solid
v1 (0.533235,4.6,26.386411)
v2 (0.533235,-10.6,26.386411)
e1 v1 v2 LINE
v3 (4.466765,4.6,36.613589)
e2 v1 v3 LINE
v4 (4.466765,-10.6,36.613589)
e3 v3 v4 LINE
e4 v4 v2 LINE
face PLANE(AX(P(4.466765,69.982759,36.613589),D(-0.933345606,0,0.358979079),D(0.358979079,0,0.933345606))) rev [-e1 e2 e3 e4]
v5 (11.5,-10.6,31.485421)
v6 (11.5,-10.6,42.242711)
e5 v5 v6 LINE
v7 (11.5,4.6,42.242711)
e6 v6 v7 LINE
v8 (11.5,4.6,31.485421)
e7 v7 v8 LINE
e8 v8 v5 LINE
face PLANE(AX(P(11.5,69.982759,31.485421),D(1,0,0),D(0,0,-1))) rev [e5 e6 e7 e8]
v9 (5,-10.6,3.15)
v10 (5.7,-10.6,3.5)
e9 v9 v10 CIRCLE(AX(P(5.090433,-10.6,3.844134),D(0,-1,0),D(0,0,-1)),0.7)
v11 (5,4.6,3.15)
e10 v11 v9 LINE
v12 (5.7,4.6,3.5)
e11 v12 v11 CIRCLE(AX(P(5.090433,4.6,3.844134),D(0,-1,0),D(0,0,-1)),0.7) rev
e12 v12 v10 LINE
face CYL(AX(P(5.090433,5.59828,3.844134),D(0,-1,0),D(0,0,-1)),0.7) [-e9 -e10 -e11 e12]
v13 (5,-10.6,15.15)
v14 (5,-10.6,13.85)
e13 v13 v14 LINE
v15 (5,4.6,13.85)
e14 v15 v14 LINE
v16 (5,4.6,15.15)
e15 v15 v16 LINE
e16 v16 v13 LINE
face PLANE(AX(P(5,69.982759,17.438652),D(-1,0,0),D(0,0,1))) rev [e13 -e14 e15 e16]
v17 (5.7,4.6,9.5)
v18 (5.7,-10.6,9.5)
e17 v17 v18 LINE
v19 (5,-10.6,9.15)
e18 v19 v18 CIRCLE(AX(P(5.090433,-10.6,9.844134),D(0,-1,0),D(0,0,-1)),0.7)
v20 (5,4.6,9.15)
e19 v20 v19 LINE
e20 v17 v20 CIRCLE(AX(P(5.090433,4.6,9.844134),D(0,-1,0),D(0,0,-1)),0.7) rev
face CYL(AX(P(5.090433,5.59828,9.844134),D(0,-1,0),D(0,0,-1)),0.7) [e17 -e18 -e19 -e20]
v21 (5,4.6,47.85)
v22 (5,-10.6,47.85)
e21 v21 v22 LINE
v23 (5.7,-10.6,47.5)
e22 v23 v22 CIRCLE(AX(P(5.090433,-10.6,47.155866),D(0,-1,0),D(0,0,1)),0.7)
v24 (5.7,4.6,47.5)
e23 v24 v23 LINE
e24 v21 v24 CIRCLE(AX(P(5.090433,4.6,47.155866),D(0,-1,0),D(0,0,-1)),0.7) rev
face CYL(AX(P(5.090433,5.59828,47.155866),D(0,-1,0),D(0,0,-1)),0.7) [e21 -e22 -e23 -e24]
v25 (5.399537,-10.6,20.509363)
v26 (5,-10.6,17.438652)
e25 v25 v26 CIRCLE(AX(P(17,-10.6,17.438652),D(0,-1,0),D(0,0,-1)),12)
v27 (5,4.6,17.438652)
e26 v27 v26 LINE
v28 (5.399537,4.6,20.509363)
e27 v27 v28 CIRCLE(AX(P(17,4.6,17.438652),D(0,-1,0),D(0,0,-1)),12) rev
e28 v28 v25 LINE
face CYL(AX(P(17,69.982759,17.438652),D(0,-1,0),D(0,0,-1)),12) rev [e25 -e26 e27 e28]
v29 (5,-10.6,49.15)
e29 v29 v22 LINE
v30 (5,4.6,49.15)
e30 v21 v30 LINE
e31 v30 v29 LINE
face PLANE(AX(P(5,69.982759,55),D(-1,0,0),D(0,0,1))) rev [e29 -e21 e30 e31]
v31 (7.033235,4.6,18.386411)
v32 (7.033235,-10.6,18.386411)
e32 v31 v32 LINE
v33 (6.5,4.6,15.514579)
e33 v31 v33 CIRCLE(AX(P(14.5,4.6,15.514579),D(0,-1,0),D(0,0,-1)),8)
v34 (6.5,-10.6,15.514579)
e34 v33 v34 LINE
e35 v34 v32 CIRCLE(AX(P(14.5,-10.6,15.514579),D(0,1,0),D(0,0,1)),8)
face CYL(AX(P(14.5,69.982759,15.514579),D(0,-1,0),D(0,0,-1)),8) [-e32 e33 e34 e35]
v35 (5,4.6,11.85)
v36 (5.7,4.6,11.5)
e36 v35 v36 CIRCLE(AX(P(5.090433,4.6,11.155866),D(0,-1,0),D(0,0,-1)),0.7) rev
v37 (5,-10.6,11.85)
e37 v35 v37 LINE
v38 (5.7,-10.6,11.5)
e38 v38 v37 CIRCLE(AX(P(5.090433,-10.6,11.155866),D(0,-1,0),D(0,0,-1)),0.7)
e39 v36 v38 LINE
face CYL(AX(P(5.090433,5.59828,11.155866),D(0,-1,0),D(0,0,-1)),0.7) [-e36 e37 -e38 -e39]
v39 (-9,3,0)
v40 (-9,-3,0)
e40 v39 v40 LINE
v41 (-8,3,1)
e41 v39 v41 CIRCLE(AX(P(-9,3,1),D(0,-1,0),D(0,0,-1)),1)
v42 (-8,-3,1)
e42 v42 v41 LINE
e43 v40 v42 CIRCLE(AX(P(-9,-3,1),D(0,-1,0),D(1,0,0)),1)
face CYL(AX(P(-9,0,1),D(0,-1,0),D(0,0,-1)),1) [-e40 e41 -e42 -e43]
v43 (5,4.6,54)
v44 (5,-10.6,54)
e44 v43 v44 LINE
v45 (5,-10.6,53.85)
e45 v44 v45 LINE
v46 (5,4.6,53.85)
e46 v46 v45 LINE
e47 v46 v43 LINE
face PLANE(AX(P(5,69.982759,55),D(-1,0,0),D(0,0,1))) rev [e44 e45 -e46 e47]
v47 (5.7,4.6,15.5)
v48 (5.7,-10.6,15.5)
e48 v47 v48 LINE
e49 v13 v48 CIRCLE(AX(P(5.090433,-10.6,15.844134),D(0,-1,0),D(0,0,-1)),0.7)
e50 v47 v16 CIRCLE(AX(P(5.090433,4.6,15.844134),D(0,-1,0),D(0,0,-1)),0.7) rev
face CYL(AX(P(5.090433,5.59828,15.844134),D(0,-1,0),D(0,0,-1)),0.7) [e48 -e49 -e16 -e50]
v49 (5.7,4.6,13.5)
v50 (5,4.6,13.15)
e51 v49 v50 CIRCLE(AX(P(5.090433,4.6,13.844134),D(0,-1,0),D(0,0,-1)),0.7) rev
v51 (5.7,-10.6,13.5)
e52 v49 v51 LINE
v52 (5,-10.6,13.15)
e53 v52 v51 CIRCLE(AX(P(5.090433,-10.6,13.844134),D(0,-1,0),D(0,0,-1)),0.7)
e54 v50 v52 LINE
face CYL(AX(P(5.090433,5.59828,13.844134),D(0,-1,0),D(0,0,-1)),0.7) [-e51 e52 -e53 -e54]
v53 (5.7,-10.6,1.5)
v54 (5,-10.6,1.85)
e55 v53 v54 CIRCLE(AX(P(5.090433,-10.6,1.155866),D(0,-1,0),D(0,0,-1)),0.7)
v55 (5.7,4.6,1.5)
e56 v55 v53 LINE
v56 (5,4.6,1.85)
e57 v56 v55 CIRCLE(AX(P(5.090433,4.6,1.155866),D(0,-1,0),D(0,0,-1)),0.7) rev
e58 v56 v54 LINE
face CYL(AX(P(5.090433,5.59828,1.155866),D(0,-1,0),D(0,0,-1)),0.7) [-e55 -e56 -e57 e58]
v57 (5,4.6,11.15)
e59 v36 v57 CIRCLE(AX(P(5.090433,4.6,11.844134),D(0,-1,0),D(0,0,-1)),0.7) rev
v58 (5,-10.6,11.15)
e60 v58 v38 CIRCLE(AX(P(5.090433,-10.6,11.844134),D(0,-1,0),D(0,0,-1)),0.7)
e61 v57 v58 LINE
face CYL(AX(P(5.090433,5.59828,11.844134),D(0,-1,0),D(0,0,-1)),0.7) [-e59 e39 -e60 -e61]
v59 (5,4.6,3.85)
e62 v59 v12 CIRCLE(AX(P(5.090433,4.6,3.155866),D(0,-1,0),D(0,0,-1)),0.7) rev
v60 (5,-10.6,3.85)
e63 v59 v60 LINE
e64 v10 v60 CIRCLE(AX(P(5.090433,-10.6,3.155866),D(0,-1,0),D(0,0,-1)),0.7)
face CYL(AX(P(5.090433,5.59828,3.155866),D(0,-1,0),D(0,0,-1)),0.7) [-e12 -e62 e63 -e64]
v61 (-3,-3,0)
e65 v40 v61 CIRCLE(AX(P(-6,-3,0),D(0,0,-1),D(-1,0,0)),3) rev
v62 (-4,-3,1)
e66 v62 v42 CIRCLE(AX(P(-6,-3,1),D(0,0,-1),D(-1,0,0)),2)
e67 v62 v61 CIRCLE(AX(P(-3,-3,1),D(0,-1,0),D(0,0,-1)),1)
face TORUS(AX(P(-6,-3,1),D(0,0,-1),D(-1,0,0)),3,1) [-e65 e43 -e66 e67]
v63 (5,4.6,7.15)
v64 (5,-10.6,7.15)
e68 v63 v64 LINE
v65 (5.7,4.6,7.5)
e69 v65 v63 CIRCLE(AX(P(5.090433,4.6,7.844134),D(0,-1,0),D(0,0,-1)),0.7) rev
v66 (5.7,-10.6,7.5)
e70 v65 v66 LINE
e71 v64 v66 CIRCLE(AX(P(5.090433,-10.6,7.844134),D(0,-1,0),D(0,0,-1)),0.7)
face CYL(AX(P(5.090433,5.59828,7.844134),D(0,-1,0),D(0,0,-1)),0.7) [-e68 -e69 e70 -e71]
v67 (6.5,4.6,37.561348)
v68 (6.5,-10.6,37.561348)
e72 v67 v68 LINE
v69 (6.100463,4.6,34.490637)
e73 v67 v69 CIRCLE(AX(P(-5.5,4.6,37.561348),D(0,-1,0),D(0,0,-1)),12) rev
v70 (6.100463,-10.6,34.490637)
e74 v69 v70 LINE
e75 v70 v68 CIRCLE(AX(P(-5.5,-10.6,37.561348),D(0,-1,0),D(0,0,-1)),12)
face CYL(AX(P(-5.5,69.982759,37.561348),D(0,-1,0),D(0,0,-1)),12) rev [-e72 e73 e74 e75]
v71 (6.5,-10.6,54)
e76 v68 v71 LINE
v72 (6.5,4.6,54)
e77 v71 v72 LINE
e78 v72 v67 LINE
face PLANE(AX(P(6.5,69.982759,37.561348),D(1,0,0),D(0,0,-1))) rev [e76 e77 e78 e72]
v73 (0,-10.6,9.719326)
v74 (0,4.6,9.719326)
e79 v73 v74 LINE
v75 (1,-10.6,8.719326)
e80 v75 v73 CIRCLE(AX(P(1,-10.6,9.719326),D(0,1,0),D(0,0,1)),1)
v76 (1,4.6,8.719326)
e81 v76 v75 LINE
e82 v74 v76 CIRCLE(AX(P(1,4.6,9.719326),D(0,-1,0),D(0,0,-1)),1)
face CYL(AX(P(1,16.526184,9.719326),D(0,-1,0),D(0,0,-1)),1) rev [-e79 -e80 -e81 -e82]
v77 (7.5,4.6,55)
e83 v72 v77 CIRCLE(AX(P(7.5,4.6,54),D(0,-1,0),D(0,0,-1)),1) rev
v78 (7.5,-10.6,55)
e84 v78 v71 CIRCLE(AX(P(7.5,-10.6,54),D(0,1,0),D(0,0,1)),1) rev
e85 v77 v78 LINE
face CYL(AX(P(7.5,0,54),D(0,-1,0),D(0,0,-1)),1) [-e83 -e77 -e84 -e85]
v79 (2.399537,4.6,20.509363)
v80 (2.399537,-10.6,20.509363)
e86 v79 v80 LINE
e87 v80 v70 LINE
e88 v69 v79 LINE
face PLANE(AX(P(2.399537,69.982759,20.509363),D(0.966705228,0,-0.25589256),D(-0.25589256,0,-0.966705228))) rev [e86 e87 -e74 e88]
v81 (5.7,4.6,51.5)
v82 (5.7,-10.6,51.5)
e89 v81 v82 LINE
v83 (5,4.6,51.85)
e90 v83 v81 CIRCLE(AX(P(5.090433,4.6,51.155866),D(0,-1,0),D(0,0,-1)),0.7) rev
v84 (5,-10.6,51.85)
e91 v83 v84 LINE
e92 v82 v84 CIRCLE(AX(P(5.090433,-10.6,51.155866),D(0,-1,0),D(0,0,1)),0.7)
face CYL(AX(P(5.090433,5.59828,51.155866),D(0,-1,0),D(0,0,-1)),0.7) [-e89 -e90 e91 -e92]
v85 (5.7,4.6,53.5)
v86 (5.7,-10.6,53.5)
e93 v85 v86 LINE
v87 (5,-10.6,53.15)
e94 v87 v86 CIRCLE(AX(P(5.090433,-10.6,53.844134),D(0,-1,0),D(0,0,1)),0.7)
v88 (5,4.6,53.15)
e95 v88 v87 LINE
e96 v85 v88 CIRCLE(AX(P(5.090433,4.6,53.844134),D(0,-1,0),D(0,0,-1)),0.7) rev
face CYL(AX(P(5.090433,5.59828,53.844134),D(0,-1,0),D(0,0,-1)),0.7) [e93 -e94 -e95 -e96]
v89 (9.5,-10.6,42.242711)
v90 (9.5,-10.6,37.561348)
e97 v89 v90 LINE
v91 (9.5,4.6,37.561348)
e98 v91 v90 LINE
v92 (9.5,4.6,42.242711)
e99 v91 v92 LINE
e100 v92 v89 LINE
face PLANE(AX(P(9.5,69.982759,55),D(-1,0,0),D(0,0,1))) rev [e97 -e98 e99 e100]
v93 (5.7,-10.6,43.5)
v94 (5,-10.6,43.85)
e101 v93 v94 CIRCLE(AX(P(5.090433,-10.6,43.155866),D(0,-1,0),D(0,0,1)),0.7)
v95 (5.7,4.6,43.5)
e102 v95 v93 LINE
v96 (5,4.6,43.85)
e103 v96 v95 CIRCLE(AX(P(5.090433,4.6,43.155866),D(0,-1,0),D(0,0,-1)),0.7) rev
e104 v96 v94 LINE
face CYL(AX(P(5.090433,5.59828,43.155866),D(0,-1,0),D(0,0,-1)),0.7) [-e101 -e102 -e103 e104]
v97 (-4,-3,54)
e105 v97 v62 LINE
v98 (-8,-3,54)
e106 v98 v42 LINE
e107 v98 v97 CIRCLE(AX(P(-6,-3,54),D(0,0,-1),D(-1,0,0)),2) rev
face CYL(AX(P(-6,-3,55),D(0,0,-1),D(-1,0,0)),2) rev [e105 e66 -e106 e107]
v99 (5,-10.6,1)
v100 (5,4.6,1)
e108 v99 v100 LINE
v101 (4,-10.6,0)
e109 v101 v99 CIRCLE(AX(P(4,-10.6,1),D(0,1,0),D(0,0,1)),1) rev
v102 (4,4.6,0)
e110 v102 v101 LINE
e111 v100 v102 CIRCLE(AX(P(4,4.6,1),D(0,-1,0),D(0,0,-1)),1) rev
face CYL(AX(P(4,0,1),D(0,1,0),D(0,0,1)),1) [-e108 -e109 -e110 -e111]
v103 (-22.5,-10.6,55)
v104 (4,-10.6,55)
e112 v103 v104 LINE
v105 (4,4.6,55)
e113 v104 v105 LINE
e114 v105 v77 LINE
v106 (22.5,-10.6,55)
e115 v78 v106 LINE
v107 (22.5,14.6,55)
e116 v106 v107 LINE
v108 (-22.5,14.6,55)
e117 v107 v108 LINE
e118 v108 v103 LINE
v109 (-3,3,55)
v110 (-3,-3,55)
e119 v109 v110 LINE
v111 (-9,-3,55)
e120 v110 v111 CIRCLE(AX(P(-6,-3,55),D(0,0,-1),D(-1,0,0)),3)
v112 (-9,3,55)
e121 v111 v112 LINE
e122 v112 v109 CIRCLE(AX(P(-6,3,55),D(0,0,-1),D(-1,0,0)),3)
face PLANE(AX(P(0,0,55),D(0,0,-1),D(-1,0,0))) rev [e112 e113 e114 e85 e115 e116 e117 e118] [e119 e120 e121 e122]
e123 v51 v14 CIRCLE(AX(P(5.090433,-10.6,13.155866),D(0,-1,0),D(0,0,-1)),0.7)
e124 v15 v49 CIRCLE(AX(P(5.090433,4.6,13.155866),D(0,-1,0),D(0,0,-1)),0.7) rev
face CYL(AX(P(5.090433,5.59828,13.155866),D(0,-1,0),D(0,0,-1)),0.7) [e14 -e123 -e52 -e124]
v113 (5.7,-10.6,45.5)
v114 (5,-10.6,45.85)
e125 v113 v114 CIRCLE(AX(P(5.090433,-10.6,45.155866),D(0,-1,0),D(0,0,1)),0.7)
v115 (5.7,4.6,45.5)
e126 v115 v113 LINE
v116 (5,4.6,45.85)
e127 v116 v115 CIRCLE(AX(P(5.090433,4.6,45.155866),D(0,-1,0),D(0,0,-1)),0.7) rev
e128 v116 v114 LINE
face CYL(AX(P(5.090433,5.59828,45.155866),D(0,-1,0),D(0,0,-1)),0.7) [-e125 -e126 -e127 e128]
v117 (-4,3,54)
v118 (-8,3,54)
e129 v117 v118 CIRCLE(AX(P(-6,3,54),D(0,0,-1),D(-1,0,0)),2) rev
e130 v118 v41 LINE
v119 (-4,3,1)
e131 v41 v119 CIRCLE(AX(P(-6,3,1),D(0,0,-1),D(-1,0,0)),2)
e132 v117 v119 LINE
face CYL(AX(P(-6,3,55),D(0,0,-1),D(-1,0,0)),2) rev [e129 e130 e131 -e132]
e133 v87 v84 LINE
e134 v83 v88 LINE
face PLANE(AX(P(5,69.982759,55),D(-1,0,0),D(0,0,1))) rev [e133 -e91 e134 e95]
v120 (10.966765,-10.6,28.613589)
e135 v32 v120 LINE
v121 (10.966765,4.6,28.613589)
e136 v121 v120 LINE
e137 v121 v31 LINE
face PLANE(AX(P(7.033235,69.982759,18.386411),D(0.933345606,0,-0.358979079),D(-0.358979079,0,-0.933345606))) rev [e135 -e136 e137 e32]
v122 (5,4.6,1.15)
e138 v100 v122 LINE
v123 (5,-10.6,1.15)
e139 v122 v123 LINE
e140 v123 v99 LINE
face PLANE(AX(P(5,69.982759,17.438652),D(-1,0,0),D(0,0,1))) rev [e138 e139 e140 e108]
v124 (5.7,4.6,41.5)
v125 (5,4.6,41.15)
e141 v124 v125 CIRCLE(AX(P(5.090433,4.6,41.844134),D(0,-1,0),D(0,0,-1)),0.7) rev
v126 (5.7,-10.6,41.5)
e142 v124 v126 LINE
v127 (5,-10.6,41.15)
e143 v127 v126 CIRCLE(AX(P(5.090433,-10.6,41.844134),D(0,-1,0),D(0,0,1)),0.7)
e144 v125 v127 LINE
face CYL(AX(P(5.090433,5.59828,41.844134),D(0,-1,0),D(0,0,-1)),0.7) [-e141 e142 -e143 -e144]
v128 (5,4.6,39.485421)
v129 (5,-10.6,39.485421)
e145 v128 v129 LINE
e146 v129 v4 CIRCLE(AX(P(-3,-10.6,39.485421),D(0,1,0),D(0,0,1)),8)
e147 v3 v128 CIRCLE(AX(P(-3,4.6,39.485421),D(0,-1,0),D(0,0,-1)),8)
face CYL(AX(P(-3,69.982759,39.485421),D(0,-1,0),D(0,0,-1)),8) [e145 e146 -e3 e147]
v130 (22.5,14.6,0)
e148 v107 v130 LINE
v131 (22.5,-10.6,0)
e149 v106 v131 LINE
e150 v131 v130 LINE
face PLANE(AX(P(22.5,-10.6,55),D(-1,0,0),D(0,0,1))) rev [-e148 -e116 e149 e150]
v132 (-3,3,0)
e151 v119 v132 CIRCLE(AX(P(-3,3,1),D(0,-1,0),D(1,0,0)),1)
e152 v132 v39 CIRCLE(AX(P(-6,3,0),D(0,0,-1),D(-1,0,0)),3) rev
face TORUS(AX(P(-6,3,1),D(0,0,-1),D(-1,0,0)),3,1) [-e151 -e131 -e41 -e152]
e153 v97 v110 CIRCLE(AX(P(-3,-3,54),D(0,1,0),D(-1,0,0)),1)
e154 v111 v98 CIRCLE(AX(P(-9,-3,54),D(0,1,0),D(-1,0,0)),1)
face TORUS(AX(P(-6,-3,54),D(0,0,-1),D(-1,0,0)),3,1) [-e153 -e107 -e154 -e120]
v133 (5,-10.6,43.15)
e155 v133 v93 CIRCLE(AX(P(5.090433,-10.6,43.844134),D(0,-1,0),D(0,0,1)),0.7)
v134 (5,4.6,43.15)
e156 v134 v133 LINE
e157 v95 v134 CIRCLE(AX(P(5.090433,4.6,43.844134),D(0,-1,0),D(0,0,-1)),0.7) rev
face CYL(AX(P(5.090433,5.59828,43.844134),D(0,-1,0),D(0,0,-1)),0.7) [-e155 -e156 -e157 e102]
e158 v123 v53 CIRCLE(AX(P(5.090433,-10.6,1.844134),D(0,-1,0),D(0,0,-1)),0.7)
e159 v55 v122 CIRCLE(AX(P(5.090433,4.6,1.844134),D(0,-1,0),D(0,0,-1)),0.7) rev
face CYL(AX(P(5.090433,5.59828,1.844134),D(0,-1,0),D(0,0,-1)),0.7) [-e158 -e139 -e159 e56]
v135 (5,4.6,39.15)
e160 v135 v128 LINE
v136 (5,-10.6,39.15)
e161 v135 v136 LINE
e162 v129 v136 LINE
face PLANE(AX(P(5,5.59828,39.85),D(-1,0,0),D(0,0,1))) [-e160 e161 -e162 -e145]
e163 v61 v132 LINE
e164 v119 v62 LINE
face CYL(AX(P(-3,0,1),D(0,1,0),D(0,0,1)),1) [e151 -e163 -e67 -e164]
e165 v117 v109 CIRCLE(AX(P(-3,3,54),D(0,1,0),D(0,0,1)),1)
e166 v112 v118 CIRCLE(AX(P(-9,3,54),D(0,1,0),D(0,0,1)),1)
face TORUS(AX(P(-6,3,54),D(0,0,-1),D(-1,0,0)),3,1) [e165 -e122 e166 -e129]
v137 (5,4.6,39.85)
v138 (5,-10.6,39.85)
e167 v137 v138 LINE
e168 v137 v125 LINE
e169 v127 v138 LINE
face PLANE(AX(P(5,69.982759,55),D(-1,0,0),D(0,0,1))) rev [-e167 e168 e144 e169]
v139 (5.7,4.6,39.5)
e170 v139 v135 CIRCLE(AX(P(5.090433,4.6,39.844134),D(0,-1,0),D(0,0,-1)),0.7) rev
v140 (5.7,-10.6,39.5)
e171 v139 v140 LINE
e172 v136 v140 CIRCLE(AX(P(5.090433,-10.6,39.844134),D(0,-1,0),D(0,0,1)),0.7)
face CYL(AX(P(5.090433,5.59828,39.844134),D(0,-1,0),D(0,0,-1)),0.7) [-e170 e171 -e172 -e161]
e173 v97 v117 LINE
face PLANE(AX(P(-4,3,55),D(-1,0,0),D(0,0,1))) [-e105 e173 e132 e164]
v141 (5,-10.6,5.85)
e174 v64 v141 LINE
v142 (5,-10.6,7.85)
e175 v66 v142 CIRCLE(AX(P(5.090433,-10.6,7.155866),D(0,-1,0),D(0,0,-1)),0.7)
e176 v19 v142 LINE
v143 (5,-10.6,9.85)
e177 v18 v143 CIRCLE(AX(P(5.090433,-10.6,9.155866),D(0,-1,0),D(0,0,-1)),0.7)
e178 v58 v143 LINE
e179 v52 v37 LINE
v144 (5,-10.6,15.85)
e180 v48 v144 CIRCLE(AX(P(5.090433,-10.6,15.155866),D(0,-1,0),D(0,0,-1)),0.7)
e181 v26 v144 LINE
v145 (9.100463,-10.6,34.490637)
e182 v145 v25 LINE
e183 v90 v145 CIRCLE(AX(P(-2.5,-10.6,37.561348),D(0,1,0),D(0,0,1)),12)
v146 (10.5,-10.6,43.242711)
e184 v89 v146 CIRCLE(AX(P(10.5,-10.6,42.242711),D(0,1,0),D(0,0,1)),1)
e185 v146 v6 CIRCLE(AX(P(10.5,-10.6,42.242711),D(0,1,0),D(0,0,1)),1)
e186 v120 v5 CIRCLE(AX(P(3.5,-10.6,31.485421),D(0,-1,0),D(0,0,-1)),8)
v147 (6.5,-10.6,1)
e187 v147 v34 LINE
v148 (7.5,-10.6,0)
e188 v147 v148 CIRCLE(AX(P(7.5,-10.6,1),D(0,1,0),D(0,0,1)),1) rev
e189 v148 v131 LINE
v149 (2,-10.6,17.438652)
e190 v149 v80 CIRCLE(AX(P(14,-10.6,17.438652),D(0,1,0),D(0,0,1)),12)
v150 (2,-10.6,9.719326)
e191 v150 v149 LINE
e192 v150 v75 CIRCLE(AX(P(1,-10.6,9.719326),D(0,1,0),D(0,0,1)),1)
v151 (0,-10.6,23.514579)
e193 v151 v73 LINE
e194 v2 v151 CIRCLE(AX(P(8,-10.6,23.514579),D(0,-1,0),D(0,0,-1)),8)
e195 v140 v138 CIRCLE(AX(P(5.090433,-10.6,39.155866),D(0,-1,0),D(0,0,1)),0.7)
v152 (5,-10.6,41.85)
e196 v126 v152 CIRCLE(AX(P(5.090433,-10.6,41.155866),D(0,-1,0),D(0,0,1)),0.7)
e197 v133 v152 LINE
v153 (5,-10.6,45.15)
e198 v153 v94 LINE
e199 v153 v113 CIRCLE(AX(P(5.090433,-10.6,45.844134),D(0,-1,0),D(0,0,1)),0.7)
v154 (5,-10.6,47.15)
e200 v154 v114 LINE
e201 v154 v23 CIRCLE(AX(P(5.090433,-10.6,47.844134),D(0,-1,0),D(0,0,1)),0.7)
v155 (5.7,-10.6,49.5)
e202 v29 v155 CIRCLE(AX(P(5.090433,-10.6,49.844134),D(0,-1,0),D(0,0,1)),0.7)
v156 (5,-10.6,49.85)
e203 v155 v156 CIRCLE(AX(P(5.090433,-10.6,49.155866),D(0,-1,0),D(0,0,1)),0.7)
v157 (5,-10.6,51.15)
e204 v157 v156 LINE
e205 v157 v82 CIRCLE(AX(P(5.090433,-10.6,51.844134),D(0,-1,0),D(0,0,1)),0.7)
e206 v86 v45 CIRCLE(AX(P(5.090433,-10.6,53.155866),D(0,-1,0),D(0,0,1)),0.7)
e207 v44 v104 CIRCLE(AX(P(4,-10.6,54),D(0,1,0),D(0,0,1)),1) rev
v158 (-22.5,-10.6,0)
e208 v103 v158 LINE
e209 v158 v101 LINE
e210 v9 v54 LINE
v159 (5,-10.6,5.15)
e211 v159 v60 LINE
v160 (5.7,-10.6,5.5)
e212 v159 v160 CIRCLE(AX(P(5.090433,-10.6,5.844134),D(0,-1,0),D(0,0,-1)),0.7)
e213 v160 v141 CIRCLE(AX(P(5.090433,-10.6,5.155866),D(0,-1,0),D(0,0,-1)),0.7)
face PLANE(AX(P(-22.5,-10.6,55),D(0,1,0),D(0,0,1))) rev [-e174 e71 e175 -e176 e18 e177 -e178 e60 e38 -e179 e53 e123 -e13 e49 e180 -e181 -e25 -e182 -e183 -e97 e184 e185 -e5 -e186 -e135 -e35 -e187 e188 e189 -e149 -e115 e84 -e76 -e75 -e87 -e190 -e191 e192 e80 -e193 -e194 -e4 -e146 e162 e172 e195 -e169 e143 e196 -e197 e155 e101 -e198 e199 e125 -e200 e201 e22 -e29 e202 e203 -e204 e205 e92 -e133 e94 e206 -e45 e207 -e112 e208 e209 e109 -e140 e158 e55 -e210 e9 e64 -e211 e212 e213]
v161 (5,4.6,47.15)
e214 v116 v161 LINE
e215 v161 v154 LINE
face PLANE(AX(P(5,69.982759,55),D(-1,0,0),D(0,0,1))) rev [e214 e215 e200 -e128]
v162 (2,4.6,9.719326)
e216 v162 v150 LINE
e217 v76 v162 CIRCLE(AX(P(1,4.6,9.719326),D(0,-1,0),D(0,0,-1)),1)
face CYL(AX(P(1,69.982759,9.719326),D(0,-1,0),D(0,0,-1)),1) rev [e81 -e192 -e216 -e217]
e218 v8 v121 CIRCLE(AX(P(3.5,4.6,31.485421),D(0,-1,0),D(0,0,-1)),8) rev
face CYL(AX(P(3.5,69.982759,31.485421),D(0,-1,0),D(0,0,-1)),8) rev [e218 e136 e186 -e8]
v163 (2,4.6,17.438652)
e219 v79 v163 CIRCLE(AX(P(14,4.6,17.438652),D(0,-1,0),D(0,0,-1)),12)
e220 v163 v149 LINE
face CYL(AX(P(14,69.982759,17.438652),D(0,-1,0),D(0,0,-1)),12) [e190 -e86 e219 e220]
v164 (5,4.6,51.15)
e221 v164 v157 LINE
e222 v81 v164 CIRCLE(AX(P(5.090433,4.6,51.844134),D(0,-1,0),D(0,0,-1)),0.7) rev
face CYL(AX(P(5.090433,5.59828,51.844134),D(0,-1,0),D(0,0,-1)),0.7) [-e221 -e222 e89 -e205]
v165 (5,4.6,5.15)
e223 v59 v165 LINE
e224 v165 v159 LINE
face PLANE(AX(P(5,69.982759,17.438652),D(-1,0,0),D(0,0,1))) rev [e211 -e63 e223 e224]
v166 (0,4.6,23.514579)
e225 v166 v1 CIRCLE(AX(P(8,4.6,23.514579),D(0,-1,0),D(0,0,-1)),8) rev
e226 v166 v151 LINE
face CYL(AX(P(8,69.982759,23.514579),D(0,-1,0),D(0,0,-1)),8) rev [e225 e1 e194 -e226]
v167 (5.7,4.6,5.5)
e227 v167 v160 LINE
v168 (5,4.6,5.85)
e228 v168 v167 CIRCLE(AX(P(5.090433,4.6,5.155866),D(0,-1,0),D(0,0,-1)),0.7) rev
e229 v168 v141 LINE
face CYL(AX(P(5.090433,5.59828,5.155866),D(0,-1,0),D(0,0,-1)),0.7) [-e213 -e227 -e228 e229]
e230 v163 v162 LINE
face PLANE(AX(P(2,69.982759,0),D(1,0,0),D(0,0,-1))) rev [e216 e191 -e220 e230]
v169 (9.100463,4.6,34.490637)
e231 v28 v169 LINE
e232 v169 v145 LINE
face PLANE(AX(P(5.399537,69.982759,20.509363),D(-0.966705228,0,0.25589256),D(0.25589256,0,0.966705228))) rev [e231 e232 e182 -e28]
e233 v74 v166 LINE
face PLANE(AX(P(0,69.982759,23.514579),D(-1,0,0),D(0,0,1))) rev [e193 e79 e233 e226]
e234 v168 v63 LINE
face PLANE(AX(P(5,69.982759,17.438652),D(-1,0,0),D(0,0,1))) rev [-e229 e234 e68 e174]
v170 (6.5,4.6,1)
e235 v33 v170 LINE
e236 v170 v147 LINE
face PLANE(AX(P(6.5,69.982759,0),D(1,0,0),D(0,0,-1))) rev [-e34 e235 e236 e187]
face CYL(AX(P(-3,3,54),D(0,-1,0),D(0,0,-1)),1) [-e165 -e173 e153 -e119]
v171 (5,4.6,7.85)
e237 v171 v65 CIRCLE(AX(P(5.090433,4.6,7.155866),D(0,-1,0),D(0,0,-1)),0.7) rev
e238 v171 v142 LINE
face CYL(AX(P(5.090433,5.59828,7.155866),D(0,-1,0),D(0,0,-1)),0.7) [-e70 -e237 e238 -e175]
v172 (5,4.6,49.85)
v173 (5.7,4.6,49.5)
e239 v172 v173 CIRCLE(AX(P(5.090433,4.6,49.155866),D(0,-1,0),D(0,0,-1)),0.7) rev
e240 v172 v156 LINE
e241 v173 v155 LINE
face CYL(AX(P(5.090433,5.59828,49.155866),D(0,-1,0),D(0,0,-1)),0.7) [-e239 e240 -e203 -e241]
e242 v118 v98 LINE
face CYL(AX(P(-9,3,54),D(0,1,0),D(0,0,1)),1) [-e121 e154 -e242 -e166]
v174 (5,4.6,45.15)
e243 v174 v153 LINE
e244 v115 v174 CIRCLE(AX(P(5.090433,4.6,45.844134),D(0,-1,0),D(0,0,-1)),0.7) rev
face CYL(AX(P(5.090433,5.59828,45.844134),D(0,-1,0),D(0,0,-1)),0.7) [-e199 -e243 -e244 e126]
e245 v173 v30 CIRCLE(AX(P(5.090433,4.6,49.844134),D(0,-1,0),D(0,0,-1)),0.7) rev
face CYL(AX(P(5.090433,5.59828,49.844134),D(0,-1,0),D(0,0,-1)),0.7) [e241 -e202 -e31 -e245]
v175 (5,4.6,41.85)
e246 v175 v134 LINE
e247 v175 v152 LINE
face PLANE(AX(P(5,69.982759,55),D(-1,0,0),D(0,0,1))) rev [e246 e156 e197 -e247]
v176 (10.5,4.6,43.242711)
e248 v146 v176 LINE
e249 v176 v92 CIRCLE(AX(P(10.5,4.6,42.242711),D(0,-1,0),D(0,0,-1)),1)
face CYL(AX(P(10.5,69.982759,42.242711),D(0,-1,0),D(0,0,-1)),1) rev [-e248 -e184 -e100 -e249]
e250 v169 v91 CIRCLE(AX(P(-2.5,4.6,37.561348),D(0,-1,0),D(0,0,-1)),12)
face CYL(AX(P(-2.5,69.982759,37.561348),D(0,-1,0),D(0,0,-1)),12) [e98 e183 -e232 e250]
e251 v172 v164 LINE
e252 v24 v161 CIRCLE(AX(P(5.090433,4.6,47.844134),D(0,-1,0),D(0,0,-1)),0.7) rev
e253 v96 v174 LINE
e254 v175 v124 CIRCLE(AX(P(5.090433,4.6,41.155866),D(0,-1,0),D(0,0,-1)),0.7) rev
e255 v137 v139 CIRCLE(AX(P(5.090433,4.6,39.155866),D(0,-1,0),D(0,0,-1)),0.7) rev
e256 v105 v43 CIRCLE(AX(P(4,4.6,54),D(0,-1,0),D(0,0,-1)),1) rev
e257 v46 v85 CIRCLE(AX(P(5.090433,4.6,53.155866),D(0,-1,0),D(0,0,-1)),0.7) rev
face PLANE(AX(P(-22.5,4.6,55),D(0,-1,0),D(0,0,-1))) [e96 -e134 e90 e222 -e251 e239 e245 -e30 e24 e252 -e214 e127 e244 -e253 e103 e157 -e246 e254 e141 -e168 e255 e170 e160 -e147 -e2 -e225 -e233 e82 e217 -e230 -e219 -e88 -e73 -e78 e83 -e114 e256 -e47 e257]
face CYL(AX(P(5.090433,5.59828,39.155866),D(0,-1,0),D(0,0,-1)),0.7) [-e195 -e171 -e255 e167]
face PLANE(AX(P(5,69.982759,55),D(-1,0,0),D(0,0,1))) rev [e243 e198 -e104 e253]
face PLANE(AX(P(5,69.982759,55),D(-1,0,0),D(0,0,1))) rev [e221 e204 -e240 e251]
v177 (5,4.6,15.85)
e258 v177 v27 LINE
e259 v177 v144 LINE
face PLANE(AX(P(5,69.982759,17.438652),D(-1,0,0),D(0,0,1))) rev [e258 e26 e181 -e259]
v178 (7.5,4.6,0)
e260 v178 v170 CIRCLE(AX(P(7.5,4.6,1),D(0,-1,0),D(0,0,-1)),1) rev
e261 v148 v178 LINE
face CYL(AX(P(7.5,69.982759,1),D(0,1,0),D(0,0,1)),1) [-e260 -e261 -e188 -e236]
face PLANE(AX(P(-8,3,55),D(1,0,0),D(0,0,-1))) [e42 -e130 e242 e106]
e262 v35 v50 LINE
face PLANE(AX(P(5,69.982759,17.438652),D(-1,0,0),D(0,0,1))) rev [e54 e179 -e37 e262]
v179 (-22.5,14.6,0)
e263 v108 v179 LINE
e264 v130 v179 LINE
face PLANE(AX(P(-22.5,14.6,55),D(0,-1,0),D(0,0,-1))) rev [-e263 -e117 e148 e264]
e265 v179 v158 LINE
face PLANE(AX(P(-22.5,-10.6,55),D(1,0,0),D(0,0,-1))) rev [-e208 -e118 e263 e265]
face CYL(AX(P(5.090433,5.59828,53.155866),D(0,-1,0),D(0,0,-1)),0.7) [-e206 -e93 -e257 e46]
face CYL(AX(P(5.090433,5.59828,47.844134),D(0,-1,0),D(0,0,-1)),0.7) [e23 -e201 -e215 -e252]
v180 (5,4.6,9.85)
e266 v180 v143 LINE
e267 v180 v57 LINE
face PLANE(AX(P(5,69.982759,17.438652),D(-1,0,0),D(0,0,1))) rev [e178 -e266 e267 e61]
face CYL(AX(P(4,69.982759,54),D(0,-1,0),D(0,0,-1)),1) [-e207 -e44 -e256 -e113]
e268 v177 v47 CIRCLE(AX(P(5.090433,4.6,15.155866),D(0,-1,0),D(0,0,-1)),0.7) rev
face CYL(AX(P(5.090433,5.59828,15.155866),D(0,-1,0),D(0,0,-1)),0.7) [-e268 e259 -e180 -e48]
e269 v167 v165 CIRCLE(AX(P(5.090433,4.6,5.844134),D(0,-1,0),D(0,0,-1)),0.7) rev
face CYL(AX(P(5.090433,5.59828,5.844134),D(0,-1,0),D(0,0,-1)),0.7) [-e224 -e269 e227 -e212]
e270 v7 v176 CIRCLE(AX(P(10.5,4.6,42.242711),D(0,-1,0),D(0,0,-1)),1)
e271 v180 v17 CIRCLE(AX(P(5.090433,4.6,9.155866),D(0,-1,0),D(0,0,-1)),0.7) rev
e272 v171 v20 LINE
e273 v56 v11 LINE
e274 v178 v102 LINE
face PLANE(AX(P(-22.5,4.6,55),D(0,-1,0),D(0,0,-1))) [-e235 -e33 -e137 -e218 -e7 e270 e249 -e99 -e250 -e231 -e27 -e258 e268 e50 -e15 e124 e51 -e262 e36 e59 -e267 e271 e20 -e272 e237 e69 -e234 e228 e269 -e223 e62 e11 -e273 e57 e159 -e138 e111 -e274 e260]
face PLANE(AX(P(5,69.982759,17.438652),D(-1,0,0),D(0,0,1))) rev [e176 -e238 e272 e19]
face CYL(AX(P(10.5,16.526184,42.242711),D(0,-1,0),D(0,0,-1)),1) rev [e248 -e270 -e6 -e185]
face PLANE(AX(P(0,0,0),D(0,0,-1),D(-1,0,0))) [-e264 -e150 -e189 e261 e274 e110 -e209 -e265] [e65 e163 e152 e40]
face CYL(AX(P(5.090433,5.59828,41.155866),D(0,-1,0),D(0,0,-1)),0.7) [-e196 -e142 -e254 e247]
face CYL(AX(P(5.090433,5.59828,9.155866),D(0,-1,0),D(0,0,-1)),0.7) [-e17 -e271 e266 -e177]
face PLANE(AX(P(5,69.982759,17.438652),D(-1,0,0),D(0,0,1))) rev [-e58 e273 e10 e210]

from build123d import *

# Parameters (mm, degrees)
ESQUISSE1_W             = 45
ESQUISSE1_H             = 25.2
BOSS_EXTRU_1_DEPTH      = 55
ENL_V_MAT_EXTRU_1_DEPTH = 15.2
ESQUISSE4_W             = 2
ESQUISSE4_H             = 11.757289378
ESQUISSE4_H_2           = 8.71932614
BOSS_EXTRU_2_DEPTH      = 15.2
BOSS_EXTRU_3_DEPTH      = 15.2
CONG_2_R                = 1
CONG_5_R                = 1
CONG_10_R               = 1


with BuildPart() as part:
    # Esquisse1 → Boss.-Extru.1 (new body)
    with BuildSketch(Plane.XY):
        with Locations((0, 2)):
            Rectangle(ESQUISSE1_W, ESQUISSE1_H)
        with BuildLine():
            Line((-4, 3), (-4, -3))
            ThreePointArc((-4, -3), (-6, -5), (-8, -3))
            Line((-8, -3), (-8, 3))
            ThreePointArc((-8, 3), (-6, 5), (-4, 3))
        make_face(mode=Mode.SUBTRACT)
    extrude(amount=BOSS_EXTRU_1_DEPTH)

    # Esquisse3 → Enlèv. mat.-Extru.1 (cut)
    with BuildSketch(Plane.XZ.offset(10.6)):
        with BuildLine():
            Line((5, 55), (5, 39.485421243))
            ThreePointArc((5, 39.485421243), (4.865561607, 38.024962206), (4.46676485, 36.613588609))
            Line((4.46676485, 36.613588609), (0.53323515, 26.386411391))
            ThreePointArc((0.53323515, 26.386411391), (0.134438393, 24.975037794), (0, 23.514578757))
            Line((0, 23.514578757), (0, 0))
            Line((0, 0), (2, 0))
            Line((2, 0), (2, 17.43865228))
            ThreePointArc((2, 17.43865228), (2.100303516, 18.986949278), (2.399537266, 20.509363004))
            Line((2.399537266, 20.509363004), (6.100462734, 34.490636996))
            ThreePointArc((6.100462734, 34.490636996), (6.399696484, 36.013050722), (6.5, 37.56134772))
            Line((6.5, 37.56134772), (6.5, 55))
            Line((6.5, 55), (5, 55))
        make_face()
        with BuildLine():
            Line((5, 17.43865228), (5, 0))
            Line((5, 0), (6.5, 0))
            Line((6.5, 0), (6.5, 15.514578757))
            ThreePointArc((6.5, 15.514578757), (6.634438393, 16.975037794), (7.03323515, 18.386411391))
            Line((7.03323515, 18.386411391), (10.96676485, 28.613588609))
            ThreePointArc((10.96676485, 28.613588609), (11.365561607, 30.024962206), (11.5, 31.485421243))
            Line((11.5, 31.485421243), (11.5, 55))
            Line((11.5, 55), (9.5, 55))
            Line((9.5, 55), (9.5, 37.56134772))
            ThreePointArc((9.5, 37.56134772), (9.399696484, 36.013050722), (9.100462734, 34.490636996))
            Line((9.100462734, 34.490636996), (5.399537266, 20.509363004))
            ThreePointArc((5.399537266, 20.509363004), (5.100303516, 18.986949278), (5, 17.43865228))
        make_face()
    extrude(amount=-ENL_V_MAT_EXTRU_1_DEPTH, mode=Mode.SUBTRACT)

    # Esquisse4 → Boss.-Extru.2 (add)
    with BuildSketch(Plane.XZ.offset(10.6)):
        with Locations((10.5, 49.121355311)):
            Rectangle(ESQUISSE4_W, ESQUISSE4_H)
        with Locations((1, 4.35966307)):
            Rectangle(ESQUISSE4_W, ESQUISSE4_H_2)
    extrude(amount=-BOSS_EXTRU_2_DEPTH)

    # Esquisse5 → Boss.-Extru.3 (add)
    with BuildSketch(Plane.XZ.offset(10.6)):
        with BuildLine():
            Line((5, 53.85), (5, 53.15))
            ThreePointArc((5, 53.15), (5.40348257, 53.21803486), (5.7, 53.5))
            ThreePointArc((5.7, 53.5), (5.40348257, 53.78196514), (5, 53.85))
        make_face()
        with BuildLine():
            Line((5, 51.85), (5, 51.15))
            ThreePointArc((5, 51.15), (5.40348257, 51.21803486), (5.7, 51.5))
            ThreePointArc((5.7, 51.5), (5.40348257, 51.78196514), (5, 51.85))
        make_face()
        with BuildLine():
            Line((5, 49.85), (5, 49.15))
            ThreePointArc((5, 49.15), (5.40348257, 49.21803486), (5.7, 49.5))
            ThreePointArc((5.7, 49.5), (5.40348257, 49.78196514), (5, 49.85))
        make_face()
        with BuildLine():
            Line((5, 47.85), (5, 47.15))
            ThreePointArc((5, 47.15), (5.40348257, 47.21803486), (5.7, 47.5))
            ThreePointArc((5.7, 47.5), (5.40348257, 47.78196514), (5, 47.85))
        make_face()
        with BuildLine():
            Line((5, 45.85), (5, 45.15))
            ThreePointArc((5, 45.15), (5.40348257, 45.21803486), (5.7, 45.5))
            ThreePointArc((5.7, 45.5), (5.40348257, 45.78196514), (5, 45.85))
        make_face()
        with BuildLine():
            Line((5, 43.85), (5, 43.15))
            ThreePointArc((5, 43.15), (5.40348257, 43.21803486), (5.7, 43.5))
            ThreePointArc((5.7, 43.5), (5.40348257, 43.78196514), (5, 43.85))
        make_face()
        with BuildLine():
            Line((5, 41.85), (5, 41.15))
            ThreePointArc((5, 41.15), (5.40348257, 41.21803486), (5.7, 41.5))
            ThreePointArc((5.7, 41.5), (5.40348257, 41.78196514), (5, 41.85))
        make_face()
        with BuildLine():
            Line((5, 39.85), (5, 39.15))
            ThreePointArc((5, 39.15), (5.40348257, 39.21803486), (5.7, 39.5))
            ThreePointArc((5.7, 39.5), (5.40348257, 39.78196514), (5, 39.85))
        make_face()
        with BuildLine():
            Line((5, 1.15), (5, 1.85))
            ThreePointArc((5, 1.85), (5.40348257, 1.78196514), (5.7, 1.5))
            ThreePointArc((5.7, 1.5), (5.40348257, 1.21803486), (5, 1.15))
        make_face()
        with BuildLine():
            Line((5, 15.15), (5, 15.85))
            ThreePointArc((5, 15.85), (5.40348257, 15.78196514), (5.7, 15.5))
            ThreePointArc((5.7, 15.5), (5.40348257, 15.21803486), (5, 15.15))
        make_face()
        with BuildLine():
            Line((5, 13.15), (5, 13.85))
            ThreePointArc((5, 13.85), (5.40348257, 13.78196514), (5.7, 13.5))
            ThreePointArc((5.7, 13.5), (5.40348257, 13.21803486), (5, 13.15))
        make_face()
        with BuildLine():
            Line((5, 11.15), (5, 11.85))
            ThreePointArc((5, 11.85), (5.40348257, 11.78196514), (5.7, 11.5))
            ThreePointArc((5.7, 11.5), (5.40348257, 11.21803486), (5, 11.15))
        make_face()
        with BuildLine():
            Line((5, 9.15), (5, 9.85))
            ThreePointArc((5, 9.85), (5.40348257, 9.78196514), (5.7, 9.5))
            ThreePointArc((5.7, 9.5), (5.40348257, 9.21803486), (5, 9.15))
        make_face()
        with BuildLine():
            Line((5, 7.15), (5, 7.85))
            ThreePointArc((5, 7.85), (5.40348257, 7.78196514), (5.7, 7.5))
            ThreePointArc((5.7, 7.5), (5.40348257, 7.21803486), (5, 7.15))
        make_face()
        with BuildLine():
            Line((5, 5.15), (5, 5.85))
            ThreePointArc((5, 5.85), (5.40348257, 5.78196514), (5.7, 5.5))
            ThreePointArc((5.7, 5.5), (5.40348257, 5.21803486), (5, 5.15))
        make_face()
        with BuildLine():
            Line((5, 3.15), (5, 3.85))
            ThreePointArc((5, 3.85), (5.40348257, 3.78196514), (5.7, 3.5))
            ThreePointArc((5.7, 3.5), (5.40348257, 3.21803486), (5, 3.15))
        make_face()
    extrude(amount=-BOSS_EXTRU_3_DEPTH)

    # Congé2
    cong_2_edges = [part.edges().sort_by_distance(p)[0] for p in [
        (2, -3, 8.71932614),
        (0, -3, 8.71932614),
        (11.5, -3, 43.242710622),
        (9.5, -3, 43.242710622),
    ]]
    fillet(cong_2_edges, radius=CONG_2_R - 0.0001)  # a hair under: the kernel refuses the full size

    # Congé5
    cong_5_edges = [part.edges().sort_by_distance(p)[0] for p in [
        (5, -3, 55),
        (6.5, -3, 55),
        (6.5, -3, 0),
        (5, -3, 0),
    ]]
    fillet(cong_5_edges, radius=CONG_5_R)

    # Congé10
    cong_10_edges = [part.edges().sort_by_distance(p)[0] for p in [
        (-6, 5, 0),
        (-8, 0, 0),
        (-6, -5, 0),
        (-4, 0, 0),
        (-6, 5, 55),
        (-8, 0, 55),
        (-6, -5, 55),
        (-4, 0, 55),
    ]]
    fillet(cong_10_edges, radius=CONG_10_R)


solid = part.part
